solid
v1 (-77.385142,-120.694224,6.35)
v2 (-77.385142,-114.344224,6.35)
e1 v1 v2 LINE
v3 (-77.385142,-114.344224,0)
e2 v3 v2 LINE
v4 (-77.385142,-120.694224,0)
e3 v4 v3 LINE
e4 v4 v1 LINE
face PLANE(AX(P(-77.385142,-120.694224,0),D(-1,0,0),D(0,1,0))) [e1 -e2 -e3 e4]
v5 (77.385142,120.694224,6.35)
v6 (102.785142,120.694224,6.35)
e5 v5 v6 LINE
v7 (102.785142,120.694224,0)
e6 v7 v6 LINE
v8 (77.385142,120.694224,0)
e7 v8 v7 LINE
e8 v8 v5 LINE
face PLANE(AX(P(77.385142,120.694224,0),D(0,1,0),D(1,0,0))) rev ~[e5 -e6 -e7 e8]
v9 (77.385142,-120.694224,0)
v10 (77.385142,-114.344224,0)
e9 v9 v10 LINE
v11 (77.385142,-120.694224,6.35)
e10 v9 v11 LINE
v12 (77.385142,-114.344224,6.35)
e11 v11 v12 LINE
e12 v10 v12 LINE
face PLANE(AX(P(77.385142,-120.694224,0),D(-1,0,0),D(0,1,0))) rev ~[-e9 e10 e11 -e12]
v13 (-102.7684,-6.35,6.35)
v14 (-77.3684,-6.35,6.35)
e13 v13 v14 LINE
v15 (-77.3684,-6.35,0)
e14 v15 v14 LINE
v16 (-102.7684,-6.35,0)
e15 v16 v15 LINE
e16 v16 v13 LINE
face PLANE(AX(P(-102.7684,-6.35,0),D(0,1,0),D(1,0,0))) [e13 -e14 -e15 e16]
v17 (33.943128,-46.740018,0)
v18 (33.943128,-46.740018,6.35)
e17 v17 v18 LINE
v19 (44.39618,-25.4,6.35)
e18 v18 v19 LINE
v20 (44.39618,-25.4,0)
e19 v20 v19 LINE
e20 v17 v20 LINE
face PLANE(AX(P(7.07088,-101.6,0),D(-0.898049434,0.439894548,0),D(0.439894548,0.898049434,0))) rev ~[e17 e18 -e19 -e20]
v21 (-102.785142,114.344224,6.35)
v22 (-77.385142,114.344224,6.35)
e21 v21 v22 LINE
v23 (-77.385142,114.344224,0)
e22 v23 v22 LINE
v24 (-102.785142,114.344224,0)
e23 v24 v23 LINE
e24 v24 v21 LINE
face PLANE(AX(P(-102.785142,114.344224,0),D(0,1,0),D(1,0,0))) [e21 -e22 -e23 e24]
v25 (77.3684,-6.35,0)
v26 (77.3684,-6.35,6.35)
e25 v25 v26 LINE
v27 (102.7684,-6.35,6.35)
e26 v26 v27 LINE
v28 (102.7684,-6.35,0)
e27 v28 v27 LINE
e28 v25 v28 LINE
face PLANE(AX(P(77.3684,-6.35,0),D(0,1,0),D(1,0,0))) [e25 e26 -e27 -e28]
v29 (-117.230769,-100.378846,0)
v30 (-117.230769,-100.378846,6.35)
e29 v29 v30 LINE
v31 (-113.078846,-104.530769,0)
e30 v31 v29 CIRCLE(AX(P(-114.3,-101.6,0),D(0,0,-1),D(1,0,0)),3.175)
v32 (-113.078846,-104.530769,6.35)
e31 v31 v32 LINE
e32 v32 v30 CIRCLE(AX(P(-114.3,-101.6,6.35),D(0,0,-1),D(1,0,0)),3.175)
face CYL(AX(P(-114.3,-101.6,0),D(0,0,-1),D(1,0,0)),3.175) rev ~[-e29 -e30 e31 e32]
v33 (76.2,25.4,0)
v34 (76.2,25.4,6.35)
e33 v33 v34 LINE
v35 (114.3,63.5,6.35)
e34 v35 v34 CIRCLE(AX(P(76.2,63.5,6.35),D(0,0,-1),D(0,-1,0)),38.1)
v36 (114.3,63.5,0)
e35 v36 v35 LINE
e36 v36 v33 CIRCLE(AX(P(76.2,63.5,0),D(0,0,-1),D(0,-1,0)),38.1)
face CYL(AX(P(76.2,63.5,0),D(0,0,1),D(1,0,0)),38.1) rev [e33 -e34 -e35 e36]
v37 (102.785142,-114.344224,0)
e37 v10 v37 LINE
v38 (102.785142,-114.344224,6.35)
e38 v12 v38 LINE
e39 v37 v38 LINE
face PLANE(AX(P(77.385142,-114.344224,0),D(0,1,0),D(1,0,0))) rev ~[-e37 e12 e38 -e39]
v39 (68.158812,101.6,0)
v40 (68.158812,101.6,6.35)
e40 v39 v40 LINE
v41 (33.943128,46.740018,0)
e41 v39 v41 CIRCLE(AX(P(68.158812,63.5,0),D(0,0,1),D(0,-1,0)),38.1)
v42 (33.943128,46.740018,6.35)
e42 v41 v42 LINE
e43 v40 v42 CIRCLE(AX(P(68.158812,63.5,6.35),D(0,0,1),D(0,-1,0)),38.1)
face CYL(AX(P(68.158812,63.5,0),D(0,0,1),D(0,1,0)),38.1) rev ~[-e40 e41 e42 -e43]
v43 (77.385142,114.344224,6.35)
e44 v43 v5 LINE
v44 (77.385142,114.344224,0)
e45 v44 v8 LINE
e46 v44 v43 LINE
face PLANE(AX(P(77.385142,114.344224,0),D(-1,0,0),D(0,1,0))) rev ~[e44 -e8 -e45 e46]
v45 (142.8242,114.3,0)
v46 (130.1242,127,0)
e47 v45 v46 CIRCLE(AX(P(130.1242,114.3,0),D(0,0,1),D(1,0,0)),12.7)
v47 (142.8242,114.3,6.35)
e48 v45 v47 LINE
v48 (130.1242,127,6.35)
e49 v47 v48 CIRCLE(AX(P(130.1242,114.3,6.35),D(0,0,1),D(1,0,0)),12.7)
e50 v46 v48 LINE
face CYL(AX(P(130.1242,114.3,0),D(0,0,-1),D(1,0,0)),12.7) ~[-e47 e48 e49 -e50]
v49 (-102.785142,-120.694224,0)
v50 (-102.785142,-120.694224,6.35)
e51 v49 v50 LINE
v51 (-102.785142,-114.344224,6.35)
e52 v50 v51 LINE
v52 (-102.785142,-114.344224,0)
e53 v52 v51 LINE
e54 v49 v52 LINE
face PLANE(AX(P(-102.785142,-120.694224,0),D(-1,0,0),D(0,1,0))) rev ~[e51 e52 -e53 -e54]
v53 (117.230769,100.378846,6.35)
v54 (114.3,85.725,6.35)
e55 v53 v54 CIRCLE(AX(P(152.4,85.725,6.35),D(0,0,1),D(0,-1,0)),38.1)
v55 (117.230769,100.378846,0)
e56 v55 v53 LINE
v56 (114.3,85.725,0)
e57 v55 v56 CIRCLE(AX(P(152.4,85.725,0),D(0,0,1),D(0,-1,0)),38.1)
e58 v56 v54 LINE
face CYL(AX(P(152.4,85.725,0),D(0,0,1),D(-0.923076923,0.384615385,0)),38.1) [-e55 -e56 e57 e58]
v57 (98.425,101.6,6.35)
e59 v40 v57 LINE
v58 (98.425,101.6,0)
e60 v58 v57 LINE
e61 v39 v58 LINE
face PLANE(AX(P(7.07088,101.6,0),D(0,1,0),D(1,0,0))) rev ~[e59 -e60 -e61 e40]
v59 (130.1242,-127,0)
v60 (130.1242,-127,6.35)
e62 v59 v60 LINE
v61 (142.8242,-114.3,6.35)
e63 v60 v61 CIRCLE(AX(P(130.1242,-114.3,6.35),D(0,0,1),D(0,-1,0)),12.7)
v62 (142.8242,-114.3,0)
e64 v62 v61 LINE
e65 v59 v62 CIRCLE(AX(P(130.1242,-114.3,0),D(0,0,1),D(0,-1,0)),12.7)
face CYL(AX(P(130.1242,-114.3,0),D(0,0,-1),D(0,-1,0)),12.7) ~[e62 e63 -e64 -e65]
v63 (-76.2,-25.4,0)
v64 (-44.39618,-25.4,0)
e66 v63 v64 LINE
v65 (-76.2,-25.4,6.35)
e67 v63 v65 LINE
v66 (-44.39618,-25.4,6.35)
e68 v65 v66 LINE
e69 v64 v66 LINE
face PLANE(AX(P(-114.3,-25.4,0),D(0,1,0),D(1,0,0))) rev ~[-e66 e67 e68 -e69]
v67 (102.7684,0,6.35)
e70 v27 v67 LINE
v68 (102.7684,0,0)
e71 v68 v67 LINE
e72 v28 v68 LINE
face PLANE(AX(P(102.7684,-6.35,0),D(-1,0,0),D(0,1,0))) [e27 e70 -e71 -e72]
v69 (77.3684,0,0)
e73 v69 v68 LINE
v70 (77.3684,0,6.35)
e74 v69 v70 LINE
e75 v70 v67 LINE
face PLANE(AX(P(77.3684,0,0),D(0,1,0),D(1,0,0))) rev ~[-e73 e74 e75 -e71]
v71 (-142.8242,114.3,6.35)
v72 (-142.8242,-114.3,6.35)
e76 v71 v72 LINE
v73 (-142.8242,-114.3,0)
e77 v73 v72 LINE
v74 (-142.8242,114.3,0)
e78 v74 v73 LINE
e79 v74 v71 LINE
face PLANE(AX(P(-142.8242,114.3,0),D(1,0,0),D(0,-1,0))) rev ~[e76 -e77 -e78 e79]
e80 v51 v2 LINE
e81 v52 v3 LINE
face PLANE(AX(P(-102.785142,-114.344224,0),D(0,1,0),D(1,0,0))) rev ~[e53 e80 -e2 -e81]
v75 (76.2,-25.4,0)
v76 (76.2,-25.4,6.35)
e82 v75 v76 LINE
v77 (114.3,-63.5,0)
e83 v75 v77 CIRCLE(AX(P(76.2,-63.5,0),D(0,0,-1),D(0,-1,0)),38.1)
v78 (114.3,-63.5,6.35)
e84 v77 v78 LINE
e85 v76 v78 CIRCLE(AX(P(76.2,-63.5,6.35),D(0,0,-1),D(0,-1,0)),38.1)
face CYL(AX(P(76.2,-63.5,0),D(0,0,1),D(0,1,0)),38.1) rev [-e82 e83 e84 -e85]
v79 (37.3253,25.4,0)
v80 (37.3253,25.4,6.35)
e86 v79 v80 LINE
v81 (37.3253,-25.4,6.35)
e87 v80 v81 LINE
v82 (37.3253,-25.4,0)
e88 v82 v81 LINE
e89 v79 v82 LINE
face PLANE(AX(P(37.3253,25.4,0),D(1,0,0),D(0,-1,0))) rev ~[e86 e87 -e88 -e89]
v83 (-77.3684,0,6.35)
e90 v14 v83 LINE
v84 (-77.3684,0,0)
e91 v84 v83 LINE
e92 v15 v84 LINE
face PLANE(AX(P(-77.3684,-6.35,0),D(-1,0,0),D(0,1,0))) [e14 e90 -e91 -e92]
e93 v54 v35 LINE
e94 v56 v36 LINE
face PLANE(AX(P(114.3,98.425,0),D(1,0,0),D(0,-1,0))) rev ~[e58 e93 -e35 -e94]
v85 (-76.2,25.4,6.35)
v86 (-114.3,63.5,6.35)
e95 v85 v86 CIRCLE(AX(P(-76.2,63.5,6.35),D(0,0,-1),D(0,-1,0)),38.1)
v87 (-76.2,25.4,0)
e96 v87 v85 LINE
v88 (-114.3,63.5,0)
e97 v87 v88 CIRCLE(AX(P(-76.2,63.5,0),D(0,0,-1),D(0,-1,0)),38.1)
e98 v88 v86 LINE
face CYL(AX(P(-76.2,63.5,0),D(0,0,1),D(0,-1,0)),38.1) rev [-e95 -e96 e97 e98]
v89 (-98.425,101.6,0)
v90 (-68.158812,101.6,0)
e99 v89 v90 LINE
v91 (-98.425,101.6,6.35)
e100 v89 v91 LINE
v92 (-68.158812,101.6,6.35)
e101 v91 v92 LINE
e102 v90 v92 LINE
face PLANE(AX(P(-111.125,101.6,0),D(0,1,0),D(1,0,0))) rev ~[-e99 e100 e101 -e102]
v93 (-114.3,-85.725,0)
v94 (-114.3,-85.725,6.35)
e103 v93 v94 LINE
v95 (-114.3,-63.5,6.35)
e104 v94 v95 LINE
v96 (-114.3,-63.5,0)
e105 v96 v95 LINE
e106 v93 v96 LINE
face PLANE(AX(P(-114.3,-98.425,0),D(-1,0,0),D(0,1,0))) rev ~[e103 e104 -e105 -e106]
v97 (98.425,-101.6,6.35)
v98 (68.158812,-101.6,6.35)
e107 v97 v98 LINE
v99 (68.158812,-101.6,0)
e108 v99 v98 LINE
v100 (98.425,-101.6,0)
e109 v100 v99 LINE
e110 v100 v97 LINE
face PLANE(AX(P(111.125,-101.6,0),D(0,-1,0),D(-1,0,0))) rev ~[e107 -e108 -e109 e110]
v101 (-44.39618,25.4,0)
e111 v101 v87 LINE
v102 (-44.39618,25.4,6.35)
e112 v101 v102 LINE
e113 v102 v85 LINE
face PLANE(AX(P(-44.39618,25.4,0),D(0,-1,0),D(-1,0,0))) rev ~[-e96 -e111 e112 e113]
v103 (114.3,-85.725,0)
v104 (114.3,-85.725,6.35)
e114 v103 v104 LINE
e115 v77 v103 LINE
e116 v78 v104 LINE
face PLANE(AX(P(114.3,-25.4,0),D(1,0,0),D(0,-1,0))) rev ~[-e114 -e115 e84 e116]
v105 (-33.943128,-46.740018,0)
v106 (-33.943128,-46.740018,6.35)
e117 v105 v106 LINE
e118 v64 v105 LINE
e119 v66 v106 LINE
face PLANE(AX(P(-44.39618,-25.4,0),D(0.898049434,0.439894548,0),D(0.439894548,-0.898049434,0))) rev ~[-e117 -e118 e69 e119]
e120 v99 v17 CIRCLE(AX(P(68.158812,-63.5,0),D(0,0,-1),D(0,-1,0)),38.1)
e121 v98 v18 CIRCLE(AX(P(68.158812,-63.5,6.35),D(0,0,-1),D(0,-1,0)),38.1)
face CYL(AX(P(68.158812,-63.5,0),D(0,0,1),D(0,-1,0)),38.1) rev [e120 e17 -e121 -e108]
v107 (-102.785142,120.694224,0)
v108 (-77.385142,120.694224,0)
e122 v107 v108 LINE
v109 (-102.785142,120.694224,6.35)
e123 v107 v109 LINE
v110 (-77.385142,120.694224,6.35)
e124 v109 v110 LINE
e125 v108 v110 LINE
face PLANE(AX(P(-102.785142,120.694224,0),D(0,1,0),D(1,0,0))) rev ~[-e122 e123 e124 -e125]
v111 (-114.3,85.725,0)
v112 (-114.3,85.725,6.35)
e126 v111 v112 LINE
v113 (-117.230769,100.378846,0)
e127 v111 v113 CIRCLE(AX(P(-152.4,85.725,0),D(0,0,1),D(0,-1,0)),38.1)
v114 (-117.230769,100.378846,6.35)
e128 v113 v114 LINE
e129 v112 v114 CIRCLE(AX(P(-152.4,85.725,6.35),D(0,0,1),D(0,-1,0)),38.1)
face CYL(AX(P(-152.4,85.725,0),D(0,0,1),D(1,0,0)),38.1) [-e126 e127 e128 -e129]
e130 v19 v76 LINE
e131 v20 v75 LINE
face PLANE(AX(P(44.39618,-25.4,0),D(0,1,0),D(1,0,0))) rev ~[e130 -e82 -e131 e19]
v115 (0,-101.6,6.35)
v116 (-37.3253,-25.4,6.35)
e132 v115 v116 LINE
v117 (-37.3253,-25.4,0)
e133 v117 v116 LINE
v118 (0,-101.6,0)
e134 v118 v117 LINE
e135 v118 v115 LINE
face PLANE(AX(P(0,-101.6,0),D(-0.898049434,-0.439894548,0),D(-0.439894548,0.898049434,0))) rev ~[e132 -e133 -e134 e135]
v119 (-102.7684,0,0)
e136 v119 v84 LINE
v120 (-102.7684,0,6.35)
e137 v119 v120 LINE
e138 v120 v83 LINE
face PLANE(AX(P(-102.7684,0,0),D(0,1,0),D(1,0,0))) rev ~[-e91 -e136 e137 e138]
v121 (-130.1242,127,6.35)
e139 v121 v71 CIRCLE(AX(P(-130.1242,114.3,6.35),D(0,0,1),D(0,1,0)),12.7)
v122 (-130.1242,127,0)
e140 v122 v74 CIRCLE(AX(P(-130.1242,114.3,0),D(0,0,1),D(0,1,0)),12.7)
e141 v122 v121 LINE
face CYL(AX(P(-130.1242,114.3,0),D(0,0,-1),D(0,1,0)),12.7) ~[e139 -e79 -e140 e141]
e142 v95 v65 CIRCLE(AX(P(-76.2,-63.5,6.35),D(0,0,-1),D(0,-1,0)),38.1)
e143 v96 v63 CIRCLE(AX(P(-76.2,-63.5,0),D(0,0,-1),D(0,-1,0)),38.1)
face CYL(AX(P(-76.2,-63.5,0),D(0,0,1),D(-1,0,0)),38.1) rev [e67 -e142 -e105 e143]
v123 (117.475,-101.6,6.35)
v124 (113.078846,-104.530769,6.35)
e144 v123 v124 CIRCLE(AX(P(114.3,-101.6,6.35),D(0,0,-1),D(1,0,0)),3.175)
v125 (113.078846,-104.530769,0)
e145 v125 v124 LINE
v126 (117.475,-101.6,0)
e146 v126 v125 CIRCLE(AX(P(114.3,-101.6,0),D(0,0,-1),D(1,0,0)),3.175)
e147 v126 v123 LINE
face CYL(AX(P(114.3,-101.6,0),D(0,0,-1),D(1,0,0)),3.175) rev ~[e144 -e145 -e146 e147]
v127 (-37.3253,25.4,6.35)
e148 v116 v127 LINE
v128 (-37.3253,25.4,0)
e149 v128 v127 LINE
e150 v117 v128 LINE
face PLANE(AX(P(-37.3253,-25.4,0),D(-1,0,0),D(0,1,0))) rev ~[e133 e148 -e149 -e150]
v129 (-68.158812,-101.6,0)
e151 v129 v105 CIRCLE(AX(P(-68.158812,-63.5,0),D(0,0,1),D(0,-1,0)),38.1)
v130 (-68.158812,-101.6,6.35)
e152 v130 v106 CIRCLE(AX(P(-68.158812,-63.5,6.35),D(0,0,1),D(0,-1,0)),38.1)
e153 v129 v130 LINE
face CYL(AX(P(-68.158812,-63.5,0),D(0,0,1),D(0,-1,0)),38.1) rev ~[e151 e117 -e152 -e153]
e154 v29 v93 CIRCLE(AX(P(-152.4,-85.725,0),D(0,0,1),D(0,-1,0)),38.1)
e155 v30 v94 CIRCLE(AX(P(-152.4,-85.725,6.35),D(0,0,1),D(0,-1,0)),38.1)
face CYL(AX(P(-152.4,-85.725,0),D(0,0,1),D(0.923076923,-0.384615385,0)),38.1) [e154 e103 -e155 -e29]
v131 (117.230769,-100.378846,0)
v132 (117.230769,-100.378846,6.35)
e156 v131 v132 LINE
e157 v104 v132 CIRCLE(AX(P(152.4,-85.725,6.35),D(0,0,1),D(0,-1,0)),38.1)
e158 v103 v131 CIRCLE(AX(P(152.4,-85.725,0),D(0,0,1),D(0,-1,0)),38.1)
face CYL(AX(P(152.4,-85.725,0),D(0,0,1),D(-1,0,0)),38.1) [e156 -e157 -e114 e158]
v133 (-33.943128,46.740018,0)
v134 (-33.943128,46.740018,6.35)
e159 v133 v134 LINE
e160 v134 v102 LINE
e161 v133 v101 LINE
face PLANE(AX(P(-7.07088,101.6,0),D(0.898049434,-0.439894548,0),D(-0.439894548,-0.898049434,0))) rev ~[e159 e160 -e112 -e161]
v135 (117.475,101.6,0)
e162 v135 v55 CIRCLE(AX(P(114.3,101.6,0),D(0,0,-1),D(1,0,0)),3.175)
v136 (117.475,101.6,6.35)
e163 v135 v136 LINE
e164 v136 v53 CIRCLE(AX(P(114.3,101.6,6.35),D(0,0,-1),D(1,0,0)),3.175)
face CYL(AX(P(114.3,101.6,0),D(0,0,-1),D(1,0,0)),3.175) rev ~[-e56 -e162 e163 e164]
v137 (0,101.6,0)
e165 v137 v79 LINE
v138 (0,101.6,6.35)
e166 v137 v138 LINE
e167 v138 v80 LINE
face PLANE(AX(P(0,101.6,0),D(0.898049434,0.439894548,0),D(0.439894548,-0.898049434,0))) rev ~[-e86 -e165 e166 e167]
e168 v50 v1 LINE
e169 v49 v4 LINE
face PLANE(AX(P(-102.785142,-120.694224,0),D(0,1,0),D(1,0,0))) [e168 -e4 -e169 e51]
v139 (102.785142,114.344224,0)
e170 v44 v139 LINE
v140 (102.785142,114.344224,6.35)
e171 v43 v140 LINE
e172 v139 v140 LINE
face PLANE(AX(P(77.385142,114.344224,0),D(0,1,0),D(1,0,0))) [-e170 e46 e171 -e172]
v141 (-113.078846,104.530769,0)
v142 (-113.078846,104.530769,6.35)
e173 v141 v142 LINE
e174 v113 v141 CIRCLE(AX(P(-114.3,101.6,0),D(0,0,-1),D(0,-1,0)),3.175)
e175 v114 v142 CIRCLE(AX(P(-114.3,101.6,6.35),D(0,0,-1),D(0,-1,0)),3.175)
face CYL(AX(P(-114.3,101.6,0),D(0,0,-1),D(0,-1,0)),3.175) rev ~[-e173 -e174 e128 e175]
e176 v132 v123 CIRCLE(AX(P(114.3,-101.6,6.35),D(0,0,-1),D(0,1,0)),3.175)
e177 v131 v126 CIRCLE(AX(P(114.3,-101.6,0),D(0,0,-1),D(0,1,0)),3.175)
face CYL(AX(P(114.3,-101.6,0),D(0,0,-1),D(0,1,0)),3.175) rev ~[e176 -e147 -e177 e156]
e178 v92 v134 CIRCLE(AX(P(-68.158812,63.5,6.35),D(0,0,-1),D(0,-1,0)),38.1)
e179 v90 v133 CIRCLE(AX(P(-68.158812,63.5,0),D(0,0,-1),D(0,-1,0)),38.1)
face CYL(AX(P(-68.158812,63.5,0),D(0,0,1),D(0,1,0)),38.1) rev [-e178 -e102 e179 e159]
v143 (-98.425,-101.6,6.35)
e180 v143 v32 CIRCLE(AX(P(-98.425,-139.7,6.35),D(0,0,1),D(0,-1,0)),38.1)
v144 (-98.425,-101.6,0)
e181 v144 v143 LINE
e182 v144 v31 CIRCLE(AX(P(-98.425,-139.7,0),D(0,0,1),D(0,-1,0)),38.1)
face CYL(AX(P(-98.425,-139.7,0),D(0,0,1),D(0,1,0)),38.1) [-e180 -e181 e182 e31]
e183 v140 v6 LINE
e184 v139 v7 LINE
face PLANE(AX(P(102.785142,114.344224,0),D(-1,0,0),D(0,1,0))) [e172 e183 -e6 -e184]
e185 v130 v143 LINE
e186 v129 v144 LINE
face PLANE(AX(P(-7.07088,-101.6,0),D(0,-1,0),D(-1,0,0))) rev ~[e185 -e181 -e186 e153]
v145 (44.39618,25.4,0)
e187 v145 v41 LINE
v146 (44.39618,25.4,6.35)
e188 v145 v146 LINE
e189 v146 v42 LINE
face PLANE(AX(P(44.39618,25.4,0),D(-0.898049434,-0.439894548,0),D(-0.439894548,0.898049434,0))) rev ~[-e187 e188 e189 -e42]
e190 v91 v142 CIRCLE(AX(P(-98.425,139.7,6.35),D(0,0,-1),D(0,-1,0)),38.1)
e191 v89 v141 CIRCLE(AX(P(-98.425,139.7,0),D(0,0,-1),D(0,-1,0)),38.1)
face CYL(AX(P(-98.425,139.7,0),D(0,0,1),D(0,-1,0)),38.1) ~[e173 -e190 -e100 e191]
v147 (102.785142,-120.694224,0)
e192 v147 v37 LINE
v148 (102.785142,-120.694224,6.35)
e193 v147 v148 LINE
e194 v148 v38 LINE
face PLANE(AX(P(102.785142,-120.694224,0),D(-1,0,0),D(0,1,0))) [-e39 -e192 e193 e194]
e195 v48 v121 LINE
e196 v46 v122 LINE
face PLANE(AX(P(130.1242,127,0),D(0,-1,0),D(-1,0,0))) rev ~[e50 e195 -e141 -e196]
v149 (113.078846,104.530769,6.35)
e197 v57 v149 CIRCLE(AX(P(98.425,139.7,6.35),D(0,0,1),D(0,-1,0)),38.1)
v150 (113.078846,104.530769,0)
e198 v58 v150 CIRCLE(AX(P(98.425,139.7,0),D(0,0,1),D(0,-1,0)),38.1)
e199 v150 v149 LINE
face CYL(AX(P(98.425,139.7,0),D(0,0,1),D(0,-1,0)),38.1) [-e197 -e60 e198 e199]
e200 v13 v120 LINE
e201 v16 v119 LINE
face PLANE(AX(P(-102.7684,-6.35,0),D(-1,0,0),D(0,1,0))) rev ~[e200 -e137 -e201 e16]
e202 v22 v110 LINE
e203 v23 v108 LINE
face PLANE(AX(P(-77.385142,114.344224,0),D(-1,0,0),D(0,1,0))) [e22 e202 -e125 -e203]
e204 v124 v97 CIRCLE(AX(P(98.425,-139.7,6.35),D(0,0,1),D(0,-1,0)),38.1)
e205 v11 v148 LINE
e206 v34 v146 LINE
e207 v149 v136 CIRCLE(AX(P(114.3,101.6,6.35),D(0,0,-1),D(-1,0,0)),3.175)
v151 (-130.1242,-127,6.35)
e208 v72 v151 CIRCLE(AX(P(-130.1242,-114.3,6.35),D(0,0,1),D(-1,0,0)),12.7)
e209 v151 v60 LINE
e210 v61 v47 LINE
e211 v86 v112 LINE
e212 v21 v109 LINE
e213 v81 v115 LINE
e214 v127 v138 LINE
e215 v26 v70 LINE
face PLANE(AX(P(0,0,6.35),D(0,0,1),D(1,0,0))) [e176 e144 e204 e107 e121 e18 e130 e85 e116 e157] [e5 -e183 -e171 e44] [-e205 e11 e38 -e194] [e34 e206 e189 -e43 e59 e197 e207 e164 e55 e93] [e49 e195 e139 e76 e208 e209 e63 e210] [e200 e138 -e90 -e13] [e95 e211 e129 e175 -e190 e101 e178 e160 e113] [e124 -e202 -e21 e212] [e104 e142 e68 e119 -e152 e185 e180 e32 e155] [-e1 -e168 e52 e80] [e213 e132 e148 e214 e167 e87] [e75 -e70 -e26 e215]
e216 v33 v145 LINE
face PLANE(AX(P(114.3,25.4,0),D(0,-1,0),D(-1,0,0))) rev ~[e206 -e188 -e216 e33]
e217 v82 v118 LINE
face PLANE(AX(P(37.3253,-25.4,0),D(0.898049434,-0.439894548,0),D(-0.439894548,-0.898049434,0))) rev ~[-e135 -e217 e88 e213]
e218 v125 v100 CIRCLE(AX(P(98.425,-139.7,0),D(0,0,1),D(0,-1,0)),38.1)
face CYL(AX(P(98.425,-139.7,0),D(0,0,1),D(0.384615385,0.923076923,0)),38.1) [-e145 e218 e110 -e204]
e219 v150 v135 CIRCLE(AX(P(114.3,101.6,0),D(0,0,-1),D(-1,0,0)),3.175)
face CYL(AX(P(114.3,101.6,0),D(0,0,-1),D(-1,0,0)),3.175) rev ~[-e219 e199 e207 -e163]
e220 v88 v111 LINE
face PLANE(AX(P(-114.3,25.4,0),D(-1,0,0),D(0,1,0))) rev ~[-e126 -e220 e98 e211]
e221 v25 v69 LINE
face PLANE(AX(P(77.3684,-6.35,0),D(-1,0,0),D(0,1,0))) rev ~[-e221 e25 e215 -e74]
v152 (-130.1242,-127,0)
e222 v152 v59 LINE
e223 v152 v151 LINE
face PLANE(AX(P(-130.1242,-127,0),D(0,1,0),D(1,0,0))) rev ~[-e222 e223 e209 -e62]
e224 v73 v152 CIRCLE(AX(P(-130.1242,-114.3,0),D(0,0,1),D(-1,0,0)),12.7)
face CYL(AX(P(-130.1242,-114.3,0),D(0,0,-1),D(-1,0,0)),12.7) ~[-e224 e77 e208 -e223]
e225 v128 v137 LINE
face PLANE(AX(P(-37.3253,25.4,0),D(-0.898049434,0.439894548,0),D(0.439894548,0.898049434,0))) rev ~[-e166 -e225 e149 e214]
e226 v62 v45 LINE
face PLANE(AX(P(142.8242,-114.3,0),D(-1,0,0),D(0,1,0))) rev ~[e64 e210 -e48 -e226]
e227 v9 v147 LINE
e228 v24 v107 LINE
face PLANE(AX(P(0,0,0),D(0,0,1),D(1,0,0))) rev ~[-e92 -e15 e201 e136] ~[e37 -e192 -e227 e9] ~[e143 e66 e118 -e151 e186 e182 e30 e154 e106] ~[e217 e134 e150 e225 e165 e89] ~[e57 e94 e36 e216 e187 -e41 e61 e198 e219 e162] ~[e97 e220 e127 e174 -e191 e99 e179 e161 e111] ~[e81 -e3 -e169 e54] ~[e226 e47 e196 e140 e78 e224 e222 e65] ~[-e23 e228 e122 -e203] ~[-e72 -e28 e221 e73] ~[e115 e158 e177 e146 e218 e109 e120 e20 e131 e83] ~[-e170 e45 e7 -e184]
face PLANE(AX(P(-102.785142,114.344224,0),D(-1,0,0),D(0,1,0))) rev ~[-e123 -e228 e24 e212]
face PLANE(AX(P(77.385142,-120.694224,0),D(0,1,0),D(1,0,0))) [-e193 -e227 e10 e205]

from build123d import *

# Parameters (mm, degrees)
F0_W     = 25.4
F0_H     = 6.35
F1_DEPTH = 6.35
F2_R     = 38.1


# Not quite as in the source:
# - a feature names something its author has since deleted; it is built from what else it names


with BuildPart() as f1:
    # F0 (on Top) → F1 (new body)
    with BuildSketch(Plane.XY):
        with BuildLine():
            ThreePointArc((142.8242, 114.3), (139.1044561211, 123.2802561211), (130.1242, 127))
            Line((130.1242, 127), (-130.1242, 127))
            ThreePointArc((-130.1242, 127), (-139.1044561211, 123.2802561211), (-142.8242, 114.3))
            Line((-142.8242, 114.3), (-142.8242, -114.3))
            ThreePointArc((-142.8242, -114.3), (-139.1044561211, -123.2802561211), (-130.1242, -127))
            Line((-130.1242, -127), (130.1242, -127))
            ThreePointArc((130.1242, -127), (139.1044561211, -123.2802561211), (142.8242, -114.3))
            Line((142.8242, -114.3), (142.8242, 114.3))
        make_face()
        with Locations((-90.0851422843, -117.5192241168)):
            Rectangle(F0_W, F0_H, mode=Mode.SUBTRACT)
        with Locations((-90.0684, -3.175)):
            Rectangle(F0_W, F0_H, mode=Mode.SUBTRACT)
        with Locations((90.0851422843, -117.5192241168)):
            Rectangle(F0_W, F0_H, mode=Mode.SUBTRACT)
        with Locations((90.0684, -3.175)):
            Rectangle(F0_W, F0_H, mode=Mode.SUBTRACT)
        with Locations((-90.0851422843, 117.5192241168)):
            Rectangle(F0_W, F0_H, mode=Mode.SUBTRACT)
        with BuildLine():
            Line((0, 101.6), (7.0708802395, 101.6))
            Line((7.0708802395, 101.6), (111.125, 101.6))
            ThreePointArc((111.125, 101.6), (114.3, 104.775), (117.475, 101.6))
            ThreePointArc((117.475, 101.6), (116.5450640303, 99.3549359697), (114.3, 98.425))
            Line((114.3, 98.425), (114.3, 25.4))
            Line((114.3, 25.4), (44.3961802395, 25.4))
            Line((44.3961802395, 25.4), (37.3253, 25.4))
            Line((37.3253, 25.4), (37.3253, -25.4))
            Line((37.3253, -25.4), (44.3961802395, -25.4))
            Line((44.3961802395, -25.4), (114.3, -25.4))
            Line((114.3, -25.4), (114.3, -98.425))
            ThreePointArc((114.3, -98.425), (116.5450640303, -99.3549359697), (117.475, -101.6))
            ThreePointArc((117.475, -101.6), (114.3, -104.775), (111.125, -101.6))
            Line((111.125, -101.6), (7.0708802395, -101.6))
            Line((7.0708802395, -101.6), (0, -101.6))
            Line((0, -101.6), (-7.0708802395, -101.6))
            Line((-7.0708802395, -101.6), (-111.125, -101.6))
            ThreePointArc((-111.125, -101.6), (-116.5450640303, -103.8450640303), (-114.3, -98.425))
            Line((-114.3, -98.425), (-114.3, -25.4))
            Line((-114.3, -25.4), (-44.3961802395, -25.4))
            Line((-44.3961802395, -25.4), (-37.3253, -25.4))
            Line((-37.3253, -25.4), (-37.3253, 25.4))
            Line((-37.3253, 25.4), (-44.3961802395, 25.4))
            Line((-44.3961802395, 25.4), (-114.3, 25.4))
            Line((-114.3, 25.4), (-114.3, 98.425))
            ThreePointArc((-114.3, 98.425), (-116.5450640303, 103.8450640303), (-111.125, 101.6))
            Line((-111.125, 101.6), (-7.0708802395, 101.6))
            Line((-7.0708802395, 101.6), (0, 101.6))
        make_face(mode=Mode.SUBTRACT)
        with Locations((90.0851422843, 117.5192241168)):
            Rectangle(F0_W, F0_H, mode=Mode.SUBTRACT)
        Polygon((-37.3253, 25.4), (0, 101.6), (-7.0708802395, 101.6), (-44.3961802395, 25.4), align=None)
        Polygon((44.3961802395, 25.4), (7.0708802395, 101.6), (0, 101.6), (37.3253, 25.4), align=None)
        Polygon((44.3961802395, -25.4), (37.3253, -25.4), (0, -101.6), (7.0708802395, -101.6), align=None)
        Polygon((0, -101.6), (-37.3253, -25.4), (-44.3961802395, -25.4), (-7.0708802395, -101.6), align=None)
    extrude(amount=F1_DEPTH)

    # F2
    f2_edges = [f1.edges().sort_by_distance(p)[0] for p in [
        (7.07088, 101.6, 3.175),
        (-7.07088, 101.6, 3.175),
        (114.3, 25.4, 3.175),
        (-114.3, 25.4, 3.175),
        (-114.3, -25.4, 3.175),
        (114.3, -25.4, 3.175),
        (-7.07088, -101.6, 3.175),
        (7.07088, -101.6, 3.175),
        (-114.3, 98.425, 3.175),
        (-111.125, 101.6, 3.175),
        (111.125, 101.6, 3.175),
        (114.3, 98.425, 3.175),
        (114.3, -98.425, 3.175),
        (111.125, -101.6, 3.175),
        (-111.125, -101.6, 3.175),
        (-114.3, -98.425, 3.175),
    ]]
    fillet(f2_edges, radius=F2_R)


solid = f1.part
